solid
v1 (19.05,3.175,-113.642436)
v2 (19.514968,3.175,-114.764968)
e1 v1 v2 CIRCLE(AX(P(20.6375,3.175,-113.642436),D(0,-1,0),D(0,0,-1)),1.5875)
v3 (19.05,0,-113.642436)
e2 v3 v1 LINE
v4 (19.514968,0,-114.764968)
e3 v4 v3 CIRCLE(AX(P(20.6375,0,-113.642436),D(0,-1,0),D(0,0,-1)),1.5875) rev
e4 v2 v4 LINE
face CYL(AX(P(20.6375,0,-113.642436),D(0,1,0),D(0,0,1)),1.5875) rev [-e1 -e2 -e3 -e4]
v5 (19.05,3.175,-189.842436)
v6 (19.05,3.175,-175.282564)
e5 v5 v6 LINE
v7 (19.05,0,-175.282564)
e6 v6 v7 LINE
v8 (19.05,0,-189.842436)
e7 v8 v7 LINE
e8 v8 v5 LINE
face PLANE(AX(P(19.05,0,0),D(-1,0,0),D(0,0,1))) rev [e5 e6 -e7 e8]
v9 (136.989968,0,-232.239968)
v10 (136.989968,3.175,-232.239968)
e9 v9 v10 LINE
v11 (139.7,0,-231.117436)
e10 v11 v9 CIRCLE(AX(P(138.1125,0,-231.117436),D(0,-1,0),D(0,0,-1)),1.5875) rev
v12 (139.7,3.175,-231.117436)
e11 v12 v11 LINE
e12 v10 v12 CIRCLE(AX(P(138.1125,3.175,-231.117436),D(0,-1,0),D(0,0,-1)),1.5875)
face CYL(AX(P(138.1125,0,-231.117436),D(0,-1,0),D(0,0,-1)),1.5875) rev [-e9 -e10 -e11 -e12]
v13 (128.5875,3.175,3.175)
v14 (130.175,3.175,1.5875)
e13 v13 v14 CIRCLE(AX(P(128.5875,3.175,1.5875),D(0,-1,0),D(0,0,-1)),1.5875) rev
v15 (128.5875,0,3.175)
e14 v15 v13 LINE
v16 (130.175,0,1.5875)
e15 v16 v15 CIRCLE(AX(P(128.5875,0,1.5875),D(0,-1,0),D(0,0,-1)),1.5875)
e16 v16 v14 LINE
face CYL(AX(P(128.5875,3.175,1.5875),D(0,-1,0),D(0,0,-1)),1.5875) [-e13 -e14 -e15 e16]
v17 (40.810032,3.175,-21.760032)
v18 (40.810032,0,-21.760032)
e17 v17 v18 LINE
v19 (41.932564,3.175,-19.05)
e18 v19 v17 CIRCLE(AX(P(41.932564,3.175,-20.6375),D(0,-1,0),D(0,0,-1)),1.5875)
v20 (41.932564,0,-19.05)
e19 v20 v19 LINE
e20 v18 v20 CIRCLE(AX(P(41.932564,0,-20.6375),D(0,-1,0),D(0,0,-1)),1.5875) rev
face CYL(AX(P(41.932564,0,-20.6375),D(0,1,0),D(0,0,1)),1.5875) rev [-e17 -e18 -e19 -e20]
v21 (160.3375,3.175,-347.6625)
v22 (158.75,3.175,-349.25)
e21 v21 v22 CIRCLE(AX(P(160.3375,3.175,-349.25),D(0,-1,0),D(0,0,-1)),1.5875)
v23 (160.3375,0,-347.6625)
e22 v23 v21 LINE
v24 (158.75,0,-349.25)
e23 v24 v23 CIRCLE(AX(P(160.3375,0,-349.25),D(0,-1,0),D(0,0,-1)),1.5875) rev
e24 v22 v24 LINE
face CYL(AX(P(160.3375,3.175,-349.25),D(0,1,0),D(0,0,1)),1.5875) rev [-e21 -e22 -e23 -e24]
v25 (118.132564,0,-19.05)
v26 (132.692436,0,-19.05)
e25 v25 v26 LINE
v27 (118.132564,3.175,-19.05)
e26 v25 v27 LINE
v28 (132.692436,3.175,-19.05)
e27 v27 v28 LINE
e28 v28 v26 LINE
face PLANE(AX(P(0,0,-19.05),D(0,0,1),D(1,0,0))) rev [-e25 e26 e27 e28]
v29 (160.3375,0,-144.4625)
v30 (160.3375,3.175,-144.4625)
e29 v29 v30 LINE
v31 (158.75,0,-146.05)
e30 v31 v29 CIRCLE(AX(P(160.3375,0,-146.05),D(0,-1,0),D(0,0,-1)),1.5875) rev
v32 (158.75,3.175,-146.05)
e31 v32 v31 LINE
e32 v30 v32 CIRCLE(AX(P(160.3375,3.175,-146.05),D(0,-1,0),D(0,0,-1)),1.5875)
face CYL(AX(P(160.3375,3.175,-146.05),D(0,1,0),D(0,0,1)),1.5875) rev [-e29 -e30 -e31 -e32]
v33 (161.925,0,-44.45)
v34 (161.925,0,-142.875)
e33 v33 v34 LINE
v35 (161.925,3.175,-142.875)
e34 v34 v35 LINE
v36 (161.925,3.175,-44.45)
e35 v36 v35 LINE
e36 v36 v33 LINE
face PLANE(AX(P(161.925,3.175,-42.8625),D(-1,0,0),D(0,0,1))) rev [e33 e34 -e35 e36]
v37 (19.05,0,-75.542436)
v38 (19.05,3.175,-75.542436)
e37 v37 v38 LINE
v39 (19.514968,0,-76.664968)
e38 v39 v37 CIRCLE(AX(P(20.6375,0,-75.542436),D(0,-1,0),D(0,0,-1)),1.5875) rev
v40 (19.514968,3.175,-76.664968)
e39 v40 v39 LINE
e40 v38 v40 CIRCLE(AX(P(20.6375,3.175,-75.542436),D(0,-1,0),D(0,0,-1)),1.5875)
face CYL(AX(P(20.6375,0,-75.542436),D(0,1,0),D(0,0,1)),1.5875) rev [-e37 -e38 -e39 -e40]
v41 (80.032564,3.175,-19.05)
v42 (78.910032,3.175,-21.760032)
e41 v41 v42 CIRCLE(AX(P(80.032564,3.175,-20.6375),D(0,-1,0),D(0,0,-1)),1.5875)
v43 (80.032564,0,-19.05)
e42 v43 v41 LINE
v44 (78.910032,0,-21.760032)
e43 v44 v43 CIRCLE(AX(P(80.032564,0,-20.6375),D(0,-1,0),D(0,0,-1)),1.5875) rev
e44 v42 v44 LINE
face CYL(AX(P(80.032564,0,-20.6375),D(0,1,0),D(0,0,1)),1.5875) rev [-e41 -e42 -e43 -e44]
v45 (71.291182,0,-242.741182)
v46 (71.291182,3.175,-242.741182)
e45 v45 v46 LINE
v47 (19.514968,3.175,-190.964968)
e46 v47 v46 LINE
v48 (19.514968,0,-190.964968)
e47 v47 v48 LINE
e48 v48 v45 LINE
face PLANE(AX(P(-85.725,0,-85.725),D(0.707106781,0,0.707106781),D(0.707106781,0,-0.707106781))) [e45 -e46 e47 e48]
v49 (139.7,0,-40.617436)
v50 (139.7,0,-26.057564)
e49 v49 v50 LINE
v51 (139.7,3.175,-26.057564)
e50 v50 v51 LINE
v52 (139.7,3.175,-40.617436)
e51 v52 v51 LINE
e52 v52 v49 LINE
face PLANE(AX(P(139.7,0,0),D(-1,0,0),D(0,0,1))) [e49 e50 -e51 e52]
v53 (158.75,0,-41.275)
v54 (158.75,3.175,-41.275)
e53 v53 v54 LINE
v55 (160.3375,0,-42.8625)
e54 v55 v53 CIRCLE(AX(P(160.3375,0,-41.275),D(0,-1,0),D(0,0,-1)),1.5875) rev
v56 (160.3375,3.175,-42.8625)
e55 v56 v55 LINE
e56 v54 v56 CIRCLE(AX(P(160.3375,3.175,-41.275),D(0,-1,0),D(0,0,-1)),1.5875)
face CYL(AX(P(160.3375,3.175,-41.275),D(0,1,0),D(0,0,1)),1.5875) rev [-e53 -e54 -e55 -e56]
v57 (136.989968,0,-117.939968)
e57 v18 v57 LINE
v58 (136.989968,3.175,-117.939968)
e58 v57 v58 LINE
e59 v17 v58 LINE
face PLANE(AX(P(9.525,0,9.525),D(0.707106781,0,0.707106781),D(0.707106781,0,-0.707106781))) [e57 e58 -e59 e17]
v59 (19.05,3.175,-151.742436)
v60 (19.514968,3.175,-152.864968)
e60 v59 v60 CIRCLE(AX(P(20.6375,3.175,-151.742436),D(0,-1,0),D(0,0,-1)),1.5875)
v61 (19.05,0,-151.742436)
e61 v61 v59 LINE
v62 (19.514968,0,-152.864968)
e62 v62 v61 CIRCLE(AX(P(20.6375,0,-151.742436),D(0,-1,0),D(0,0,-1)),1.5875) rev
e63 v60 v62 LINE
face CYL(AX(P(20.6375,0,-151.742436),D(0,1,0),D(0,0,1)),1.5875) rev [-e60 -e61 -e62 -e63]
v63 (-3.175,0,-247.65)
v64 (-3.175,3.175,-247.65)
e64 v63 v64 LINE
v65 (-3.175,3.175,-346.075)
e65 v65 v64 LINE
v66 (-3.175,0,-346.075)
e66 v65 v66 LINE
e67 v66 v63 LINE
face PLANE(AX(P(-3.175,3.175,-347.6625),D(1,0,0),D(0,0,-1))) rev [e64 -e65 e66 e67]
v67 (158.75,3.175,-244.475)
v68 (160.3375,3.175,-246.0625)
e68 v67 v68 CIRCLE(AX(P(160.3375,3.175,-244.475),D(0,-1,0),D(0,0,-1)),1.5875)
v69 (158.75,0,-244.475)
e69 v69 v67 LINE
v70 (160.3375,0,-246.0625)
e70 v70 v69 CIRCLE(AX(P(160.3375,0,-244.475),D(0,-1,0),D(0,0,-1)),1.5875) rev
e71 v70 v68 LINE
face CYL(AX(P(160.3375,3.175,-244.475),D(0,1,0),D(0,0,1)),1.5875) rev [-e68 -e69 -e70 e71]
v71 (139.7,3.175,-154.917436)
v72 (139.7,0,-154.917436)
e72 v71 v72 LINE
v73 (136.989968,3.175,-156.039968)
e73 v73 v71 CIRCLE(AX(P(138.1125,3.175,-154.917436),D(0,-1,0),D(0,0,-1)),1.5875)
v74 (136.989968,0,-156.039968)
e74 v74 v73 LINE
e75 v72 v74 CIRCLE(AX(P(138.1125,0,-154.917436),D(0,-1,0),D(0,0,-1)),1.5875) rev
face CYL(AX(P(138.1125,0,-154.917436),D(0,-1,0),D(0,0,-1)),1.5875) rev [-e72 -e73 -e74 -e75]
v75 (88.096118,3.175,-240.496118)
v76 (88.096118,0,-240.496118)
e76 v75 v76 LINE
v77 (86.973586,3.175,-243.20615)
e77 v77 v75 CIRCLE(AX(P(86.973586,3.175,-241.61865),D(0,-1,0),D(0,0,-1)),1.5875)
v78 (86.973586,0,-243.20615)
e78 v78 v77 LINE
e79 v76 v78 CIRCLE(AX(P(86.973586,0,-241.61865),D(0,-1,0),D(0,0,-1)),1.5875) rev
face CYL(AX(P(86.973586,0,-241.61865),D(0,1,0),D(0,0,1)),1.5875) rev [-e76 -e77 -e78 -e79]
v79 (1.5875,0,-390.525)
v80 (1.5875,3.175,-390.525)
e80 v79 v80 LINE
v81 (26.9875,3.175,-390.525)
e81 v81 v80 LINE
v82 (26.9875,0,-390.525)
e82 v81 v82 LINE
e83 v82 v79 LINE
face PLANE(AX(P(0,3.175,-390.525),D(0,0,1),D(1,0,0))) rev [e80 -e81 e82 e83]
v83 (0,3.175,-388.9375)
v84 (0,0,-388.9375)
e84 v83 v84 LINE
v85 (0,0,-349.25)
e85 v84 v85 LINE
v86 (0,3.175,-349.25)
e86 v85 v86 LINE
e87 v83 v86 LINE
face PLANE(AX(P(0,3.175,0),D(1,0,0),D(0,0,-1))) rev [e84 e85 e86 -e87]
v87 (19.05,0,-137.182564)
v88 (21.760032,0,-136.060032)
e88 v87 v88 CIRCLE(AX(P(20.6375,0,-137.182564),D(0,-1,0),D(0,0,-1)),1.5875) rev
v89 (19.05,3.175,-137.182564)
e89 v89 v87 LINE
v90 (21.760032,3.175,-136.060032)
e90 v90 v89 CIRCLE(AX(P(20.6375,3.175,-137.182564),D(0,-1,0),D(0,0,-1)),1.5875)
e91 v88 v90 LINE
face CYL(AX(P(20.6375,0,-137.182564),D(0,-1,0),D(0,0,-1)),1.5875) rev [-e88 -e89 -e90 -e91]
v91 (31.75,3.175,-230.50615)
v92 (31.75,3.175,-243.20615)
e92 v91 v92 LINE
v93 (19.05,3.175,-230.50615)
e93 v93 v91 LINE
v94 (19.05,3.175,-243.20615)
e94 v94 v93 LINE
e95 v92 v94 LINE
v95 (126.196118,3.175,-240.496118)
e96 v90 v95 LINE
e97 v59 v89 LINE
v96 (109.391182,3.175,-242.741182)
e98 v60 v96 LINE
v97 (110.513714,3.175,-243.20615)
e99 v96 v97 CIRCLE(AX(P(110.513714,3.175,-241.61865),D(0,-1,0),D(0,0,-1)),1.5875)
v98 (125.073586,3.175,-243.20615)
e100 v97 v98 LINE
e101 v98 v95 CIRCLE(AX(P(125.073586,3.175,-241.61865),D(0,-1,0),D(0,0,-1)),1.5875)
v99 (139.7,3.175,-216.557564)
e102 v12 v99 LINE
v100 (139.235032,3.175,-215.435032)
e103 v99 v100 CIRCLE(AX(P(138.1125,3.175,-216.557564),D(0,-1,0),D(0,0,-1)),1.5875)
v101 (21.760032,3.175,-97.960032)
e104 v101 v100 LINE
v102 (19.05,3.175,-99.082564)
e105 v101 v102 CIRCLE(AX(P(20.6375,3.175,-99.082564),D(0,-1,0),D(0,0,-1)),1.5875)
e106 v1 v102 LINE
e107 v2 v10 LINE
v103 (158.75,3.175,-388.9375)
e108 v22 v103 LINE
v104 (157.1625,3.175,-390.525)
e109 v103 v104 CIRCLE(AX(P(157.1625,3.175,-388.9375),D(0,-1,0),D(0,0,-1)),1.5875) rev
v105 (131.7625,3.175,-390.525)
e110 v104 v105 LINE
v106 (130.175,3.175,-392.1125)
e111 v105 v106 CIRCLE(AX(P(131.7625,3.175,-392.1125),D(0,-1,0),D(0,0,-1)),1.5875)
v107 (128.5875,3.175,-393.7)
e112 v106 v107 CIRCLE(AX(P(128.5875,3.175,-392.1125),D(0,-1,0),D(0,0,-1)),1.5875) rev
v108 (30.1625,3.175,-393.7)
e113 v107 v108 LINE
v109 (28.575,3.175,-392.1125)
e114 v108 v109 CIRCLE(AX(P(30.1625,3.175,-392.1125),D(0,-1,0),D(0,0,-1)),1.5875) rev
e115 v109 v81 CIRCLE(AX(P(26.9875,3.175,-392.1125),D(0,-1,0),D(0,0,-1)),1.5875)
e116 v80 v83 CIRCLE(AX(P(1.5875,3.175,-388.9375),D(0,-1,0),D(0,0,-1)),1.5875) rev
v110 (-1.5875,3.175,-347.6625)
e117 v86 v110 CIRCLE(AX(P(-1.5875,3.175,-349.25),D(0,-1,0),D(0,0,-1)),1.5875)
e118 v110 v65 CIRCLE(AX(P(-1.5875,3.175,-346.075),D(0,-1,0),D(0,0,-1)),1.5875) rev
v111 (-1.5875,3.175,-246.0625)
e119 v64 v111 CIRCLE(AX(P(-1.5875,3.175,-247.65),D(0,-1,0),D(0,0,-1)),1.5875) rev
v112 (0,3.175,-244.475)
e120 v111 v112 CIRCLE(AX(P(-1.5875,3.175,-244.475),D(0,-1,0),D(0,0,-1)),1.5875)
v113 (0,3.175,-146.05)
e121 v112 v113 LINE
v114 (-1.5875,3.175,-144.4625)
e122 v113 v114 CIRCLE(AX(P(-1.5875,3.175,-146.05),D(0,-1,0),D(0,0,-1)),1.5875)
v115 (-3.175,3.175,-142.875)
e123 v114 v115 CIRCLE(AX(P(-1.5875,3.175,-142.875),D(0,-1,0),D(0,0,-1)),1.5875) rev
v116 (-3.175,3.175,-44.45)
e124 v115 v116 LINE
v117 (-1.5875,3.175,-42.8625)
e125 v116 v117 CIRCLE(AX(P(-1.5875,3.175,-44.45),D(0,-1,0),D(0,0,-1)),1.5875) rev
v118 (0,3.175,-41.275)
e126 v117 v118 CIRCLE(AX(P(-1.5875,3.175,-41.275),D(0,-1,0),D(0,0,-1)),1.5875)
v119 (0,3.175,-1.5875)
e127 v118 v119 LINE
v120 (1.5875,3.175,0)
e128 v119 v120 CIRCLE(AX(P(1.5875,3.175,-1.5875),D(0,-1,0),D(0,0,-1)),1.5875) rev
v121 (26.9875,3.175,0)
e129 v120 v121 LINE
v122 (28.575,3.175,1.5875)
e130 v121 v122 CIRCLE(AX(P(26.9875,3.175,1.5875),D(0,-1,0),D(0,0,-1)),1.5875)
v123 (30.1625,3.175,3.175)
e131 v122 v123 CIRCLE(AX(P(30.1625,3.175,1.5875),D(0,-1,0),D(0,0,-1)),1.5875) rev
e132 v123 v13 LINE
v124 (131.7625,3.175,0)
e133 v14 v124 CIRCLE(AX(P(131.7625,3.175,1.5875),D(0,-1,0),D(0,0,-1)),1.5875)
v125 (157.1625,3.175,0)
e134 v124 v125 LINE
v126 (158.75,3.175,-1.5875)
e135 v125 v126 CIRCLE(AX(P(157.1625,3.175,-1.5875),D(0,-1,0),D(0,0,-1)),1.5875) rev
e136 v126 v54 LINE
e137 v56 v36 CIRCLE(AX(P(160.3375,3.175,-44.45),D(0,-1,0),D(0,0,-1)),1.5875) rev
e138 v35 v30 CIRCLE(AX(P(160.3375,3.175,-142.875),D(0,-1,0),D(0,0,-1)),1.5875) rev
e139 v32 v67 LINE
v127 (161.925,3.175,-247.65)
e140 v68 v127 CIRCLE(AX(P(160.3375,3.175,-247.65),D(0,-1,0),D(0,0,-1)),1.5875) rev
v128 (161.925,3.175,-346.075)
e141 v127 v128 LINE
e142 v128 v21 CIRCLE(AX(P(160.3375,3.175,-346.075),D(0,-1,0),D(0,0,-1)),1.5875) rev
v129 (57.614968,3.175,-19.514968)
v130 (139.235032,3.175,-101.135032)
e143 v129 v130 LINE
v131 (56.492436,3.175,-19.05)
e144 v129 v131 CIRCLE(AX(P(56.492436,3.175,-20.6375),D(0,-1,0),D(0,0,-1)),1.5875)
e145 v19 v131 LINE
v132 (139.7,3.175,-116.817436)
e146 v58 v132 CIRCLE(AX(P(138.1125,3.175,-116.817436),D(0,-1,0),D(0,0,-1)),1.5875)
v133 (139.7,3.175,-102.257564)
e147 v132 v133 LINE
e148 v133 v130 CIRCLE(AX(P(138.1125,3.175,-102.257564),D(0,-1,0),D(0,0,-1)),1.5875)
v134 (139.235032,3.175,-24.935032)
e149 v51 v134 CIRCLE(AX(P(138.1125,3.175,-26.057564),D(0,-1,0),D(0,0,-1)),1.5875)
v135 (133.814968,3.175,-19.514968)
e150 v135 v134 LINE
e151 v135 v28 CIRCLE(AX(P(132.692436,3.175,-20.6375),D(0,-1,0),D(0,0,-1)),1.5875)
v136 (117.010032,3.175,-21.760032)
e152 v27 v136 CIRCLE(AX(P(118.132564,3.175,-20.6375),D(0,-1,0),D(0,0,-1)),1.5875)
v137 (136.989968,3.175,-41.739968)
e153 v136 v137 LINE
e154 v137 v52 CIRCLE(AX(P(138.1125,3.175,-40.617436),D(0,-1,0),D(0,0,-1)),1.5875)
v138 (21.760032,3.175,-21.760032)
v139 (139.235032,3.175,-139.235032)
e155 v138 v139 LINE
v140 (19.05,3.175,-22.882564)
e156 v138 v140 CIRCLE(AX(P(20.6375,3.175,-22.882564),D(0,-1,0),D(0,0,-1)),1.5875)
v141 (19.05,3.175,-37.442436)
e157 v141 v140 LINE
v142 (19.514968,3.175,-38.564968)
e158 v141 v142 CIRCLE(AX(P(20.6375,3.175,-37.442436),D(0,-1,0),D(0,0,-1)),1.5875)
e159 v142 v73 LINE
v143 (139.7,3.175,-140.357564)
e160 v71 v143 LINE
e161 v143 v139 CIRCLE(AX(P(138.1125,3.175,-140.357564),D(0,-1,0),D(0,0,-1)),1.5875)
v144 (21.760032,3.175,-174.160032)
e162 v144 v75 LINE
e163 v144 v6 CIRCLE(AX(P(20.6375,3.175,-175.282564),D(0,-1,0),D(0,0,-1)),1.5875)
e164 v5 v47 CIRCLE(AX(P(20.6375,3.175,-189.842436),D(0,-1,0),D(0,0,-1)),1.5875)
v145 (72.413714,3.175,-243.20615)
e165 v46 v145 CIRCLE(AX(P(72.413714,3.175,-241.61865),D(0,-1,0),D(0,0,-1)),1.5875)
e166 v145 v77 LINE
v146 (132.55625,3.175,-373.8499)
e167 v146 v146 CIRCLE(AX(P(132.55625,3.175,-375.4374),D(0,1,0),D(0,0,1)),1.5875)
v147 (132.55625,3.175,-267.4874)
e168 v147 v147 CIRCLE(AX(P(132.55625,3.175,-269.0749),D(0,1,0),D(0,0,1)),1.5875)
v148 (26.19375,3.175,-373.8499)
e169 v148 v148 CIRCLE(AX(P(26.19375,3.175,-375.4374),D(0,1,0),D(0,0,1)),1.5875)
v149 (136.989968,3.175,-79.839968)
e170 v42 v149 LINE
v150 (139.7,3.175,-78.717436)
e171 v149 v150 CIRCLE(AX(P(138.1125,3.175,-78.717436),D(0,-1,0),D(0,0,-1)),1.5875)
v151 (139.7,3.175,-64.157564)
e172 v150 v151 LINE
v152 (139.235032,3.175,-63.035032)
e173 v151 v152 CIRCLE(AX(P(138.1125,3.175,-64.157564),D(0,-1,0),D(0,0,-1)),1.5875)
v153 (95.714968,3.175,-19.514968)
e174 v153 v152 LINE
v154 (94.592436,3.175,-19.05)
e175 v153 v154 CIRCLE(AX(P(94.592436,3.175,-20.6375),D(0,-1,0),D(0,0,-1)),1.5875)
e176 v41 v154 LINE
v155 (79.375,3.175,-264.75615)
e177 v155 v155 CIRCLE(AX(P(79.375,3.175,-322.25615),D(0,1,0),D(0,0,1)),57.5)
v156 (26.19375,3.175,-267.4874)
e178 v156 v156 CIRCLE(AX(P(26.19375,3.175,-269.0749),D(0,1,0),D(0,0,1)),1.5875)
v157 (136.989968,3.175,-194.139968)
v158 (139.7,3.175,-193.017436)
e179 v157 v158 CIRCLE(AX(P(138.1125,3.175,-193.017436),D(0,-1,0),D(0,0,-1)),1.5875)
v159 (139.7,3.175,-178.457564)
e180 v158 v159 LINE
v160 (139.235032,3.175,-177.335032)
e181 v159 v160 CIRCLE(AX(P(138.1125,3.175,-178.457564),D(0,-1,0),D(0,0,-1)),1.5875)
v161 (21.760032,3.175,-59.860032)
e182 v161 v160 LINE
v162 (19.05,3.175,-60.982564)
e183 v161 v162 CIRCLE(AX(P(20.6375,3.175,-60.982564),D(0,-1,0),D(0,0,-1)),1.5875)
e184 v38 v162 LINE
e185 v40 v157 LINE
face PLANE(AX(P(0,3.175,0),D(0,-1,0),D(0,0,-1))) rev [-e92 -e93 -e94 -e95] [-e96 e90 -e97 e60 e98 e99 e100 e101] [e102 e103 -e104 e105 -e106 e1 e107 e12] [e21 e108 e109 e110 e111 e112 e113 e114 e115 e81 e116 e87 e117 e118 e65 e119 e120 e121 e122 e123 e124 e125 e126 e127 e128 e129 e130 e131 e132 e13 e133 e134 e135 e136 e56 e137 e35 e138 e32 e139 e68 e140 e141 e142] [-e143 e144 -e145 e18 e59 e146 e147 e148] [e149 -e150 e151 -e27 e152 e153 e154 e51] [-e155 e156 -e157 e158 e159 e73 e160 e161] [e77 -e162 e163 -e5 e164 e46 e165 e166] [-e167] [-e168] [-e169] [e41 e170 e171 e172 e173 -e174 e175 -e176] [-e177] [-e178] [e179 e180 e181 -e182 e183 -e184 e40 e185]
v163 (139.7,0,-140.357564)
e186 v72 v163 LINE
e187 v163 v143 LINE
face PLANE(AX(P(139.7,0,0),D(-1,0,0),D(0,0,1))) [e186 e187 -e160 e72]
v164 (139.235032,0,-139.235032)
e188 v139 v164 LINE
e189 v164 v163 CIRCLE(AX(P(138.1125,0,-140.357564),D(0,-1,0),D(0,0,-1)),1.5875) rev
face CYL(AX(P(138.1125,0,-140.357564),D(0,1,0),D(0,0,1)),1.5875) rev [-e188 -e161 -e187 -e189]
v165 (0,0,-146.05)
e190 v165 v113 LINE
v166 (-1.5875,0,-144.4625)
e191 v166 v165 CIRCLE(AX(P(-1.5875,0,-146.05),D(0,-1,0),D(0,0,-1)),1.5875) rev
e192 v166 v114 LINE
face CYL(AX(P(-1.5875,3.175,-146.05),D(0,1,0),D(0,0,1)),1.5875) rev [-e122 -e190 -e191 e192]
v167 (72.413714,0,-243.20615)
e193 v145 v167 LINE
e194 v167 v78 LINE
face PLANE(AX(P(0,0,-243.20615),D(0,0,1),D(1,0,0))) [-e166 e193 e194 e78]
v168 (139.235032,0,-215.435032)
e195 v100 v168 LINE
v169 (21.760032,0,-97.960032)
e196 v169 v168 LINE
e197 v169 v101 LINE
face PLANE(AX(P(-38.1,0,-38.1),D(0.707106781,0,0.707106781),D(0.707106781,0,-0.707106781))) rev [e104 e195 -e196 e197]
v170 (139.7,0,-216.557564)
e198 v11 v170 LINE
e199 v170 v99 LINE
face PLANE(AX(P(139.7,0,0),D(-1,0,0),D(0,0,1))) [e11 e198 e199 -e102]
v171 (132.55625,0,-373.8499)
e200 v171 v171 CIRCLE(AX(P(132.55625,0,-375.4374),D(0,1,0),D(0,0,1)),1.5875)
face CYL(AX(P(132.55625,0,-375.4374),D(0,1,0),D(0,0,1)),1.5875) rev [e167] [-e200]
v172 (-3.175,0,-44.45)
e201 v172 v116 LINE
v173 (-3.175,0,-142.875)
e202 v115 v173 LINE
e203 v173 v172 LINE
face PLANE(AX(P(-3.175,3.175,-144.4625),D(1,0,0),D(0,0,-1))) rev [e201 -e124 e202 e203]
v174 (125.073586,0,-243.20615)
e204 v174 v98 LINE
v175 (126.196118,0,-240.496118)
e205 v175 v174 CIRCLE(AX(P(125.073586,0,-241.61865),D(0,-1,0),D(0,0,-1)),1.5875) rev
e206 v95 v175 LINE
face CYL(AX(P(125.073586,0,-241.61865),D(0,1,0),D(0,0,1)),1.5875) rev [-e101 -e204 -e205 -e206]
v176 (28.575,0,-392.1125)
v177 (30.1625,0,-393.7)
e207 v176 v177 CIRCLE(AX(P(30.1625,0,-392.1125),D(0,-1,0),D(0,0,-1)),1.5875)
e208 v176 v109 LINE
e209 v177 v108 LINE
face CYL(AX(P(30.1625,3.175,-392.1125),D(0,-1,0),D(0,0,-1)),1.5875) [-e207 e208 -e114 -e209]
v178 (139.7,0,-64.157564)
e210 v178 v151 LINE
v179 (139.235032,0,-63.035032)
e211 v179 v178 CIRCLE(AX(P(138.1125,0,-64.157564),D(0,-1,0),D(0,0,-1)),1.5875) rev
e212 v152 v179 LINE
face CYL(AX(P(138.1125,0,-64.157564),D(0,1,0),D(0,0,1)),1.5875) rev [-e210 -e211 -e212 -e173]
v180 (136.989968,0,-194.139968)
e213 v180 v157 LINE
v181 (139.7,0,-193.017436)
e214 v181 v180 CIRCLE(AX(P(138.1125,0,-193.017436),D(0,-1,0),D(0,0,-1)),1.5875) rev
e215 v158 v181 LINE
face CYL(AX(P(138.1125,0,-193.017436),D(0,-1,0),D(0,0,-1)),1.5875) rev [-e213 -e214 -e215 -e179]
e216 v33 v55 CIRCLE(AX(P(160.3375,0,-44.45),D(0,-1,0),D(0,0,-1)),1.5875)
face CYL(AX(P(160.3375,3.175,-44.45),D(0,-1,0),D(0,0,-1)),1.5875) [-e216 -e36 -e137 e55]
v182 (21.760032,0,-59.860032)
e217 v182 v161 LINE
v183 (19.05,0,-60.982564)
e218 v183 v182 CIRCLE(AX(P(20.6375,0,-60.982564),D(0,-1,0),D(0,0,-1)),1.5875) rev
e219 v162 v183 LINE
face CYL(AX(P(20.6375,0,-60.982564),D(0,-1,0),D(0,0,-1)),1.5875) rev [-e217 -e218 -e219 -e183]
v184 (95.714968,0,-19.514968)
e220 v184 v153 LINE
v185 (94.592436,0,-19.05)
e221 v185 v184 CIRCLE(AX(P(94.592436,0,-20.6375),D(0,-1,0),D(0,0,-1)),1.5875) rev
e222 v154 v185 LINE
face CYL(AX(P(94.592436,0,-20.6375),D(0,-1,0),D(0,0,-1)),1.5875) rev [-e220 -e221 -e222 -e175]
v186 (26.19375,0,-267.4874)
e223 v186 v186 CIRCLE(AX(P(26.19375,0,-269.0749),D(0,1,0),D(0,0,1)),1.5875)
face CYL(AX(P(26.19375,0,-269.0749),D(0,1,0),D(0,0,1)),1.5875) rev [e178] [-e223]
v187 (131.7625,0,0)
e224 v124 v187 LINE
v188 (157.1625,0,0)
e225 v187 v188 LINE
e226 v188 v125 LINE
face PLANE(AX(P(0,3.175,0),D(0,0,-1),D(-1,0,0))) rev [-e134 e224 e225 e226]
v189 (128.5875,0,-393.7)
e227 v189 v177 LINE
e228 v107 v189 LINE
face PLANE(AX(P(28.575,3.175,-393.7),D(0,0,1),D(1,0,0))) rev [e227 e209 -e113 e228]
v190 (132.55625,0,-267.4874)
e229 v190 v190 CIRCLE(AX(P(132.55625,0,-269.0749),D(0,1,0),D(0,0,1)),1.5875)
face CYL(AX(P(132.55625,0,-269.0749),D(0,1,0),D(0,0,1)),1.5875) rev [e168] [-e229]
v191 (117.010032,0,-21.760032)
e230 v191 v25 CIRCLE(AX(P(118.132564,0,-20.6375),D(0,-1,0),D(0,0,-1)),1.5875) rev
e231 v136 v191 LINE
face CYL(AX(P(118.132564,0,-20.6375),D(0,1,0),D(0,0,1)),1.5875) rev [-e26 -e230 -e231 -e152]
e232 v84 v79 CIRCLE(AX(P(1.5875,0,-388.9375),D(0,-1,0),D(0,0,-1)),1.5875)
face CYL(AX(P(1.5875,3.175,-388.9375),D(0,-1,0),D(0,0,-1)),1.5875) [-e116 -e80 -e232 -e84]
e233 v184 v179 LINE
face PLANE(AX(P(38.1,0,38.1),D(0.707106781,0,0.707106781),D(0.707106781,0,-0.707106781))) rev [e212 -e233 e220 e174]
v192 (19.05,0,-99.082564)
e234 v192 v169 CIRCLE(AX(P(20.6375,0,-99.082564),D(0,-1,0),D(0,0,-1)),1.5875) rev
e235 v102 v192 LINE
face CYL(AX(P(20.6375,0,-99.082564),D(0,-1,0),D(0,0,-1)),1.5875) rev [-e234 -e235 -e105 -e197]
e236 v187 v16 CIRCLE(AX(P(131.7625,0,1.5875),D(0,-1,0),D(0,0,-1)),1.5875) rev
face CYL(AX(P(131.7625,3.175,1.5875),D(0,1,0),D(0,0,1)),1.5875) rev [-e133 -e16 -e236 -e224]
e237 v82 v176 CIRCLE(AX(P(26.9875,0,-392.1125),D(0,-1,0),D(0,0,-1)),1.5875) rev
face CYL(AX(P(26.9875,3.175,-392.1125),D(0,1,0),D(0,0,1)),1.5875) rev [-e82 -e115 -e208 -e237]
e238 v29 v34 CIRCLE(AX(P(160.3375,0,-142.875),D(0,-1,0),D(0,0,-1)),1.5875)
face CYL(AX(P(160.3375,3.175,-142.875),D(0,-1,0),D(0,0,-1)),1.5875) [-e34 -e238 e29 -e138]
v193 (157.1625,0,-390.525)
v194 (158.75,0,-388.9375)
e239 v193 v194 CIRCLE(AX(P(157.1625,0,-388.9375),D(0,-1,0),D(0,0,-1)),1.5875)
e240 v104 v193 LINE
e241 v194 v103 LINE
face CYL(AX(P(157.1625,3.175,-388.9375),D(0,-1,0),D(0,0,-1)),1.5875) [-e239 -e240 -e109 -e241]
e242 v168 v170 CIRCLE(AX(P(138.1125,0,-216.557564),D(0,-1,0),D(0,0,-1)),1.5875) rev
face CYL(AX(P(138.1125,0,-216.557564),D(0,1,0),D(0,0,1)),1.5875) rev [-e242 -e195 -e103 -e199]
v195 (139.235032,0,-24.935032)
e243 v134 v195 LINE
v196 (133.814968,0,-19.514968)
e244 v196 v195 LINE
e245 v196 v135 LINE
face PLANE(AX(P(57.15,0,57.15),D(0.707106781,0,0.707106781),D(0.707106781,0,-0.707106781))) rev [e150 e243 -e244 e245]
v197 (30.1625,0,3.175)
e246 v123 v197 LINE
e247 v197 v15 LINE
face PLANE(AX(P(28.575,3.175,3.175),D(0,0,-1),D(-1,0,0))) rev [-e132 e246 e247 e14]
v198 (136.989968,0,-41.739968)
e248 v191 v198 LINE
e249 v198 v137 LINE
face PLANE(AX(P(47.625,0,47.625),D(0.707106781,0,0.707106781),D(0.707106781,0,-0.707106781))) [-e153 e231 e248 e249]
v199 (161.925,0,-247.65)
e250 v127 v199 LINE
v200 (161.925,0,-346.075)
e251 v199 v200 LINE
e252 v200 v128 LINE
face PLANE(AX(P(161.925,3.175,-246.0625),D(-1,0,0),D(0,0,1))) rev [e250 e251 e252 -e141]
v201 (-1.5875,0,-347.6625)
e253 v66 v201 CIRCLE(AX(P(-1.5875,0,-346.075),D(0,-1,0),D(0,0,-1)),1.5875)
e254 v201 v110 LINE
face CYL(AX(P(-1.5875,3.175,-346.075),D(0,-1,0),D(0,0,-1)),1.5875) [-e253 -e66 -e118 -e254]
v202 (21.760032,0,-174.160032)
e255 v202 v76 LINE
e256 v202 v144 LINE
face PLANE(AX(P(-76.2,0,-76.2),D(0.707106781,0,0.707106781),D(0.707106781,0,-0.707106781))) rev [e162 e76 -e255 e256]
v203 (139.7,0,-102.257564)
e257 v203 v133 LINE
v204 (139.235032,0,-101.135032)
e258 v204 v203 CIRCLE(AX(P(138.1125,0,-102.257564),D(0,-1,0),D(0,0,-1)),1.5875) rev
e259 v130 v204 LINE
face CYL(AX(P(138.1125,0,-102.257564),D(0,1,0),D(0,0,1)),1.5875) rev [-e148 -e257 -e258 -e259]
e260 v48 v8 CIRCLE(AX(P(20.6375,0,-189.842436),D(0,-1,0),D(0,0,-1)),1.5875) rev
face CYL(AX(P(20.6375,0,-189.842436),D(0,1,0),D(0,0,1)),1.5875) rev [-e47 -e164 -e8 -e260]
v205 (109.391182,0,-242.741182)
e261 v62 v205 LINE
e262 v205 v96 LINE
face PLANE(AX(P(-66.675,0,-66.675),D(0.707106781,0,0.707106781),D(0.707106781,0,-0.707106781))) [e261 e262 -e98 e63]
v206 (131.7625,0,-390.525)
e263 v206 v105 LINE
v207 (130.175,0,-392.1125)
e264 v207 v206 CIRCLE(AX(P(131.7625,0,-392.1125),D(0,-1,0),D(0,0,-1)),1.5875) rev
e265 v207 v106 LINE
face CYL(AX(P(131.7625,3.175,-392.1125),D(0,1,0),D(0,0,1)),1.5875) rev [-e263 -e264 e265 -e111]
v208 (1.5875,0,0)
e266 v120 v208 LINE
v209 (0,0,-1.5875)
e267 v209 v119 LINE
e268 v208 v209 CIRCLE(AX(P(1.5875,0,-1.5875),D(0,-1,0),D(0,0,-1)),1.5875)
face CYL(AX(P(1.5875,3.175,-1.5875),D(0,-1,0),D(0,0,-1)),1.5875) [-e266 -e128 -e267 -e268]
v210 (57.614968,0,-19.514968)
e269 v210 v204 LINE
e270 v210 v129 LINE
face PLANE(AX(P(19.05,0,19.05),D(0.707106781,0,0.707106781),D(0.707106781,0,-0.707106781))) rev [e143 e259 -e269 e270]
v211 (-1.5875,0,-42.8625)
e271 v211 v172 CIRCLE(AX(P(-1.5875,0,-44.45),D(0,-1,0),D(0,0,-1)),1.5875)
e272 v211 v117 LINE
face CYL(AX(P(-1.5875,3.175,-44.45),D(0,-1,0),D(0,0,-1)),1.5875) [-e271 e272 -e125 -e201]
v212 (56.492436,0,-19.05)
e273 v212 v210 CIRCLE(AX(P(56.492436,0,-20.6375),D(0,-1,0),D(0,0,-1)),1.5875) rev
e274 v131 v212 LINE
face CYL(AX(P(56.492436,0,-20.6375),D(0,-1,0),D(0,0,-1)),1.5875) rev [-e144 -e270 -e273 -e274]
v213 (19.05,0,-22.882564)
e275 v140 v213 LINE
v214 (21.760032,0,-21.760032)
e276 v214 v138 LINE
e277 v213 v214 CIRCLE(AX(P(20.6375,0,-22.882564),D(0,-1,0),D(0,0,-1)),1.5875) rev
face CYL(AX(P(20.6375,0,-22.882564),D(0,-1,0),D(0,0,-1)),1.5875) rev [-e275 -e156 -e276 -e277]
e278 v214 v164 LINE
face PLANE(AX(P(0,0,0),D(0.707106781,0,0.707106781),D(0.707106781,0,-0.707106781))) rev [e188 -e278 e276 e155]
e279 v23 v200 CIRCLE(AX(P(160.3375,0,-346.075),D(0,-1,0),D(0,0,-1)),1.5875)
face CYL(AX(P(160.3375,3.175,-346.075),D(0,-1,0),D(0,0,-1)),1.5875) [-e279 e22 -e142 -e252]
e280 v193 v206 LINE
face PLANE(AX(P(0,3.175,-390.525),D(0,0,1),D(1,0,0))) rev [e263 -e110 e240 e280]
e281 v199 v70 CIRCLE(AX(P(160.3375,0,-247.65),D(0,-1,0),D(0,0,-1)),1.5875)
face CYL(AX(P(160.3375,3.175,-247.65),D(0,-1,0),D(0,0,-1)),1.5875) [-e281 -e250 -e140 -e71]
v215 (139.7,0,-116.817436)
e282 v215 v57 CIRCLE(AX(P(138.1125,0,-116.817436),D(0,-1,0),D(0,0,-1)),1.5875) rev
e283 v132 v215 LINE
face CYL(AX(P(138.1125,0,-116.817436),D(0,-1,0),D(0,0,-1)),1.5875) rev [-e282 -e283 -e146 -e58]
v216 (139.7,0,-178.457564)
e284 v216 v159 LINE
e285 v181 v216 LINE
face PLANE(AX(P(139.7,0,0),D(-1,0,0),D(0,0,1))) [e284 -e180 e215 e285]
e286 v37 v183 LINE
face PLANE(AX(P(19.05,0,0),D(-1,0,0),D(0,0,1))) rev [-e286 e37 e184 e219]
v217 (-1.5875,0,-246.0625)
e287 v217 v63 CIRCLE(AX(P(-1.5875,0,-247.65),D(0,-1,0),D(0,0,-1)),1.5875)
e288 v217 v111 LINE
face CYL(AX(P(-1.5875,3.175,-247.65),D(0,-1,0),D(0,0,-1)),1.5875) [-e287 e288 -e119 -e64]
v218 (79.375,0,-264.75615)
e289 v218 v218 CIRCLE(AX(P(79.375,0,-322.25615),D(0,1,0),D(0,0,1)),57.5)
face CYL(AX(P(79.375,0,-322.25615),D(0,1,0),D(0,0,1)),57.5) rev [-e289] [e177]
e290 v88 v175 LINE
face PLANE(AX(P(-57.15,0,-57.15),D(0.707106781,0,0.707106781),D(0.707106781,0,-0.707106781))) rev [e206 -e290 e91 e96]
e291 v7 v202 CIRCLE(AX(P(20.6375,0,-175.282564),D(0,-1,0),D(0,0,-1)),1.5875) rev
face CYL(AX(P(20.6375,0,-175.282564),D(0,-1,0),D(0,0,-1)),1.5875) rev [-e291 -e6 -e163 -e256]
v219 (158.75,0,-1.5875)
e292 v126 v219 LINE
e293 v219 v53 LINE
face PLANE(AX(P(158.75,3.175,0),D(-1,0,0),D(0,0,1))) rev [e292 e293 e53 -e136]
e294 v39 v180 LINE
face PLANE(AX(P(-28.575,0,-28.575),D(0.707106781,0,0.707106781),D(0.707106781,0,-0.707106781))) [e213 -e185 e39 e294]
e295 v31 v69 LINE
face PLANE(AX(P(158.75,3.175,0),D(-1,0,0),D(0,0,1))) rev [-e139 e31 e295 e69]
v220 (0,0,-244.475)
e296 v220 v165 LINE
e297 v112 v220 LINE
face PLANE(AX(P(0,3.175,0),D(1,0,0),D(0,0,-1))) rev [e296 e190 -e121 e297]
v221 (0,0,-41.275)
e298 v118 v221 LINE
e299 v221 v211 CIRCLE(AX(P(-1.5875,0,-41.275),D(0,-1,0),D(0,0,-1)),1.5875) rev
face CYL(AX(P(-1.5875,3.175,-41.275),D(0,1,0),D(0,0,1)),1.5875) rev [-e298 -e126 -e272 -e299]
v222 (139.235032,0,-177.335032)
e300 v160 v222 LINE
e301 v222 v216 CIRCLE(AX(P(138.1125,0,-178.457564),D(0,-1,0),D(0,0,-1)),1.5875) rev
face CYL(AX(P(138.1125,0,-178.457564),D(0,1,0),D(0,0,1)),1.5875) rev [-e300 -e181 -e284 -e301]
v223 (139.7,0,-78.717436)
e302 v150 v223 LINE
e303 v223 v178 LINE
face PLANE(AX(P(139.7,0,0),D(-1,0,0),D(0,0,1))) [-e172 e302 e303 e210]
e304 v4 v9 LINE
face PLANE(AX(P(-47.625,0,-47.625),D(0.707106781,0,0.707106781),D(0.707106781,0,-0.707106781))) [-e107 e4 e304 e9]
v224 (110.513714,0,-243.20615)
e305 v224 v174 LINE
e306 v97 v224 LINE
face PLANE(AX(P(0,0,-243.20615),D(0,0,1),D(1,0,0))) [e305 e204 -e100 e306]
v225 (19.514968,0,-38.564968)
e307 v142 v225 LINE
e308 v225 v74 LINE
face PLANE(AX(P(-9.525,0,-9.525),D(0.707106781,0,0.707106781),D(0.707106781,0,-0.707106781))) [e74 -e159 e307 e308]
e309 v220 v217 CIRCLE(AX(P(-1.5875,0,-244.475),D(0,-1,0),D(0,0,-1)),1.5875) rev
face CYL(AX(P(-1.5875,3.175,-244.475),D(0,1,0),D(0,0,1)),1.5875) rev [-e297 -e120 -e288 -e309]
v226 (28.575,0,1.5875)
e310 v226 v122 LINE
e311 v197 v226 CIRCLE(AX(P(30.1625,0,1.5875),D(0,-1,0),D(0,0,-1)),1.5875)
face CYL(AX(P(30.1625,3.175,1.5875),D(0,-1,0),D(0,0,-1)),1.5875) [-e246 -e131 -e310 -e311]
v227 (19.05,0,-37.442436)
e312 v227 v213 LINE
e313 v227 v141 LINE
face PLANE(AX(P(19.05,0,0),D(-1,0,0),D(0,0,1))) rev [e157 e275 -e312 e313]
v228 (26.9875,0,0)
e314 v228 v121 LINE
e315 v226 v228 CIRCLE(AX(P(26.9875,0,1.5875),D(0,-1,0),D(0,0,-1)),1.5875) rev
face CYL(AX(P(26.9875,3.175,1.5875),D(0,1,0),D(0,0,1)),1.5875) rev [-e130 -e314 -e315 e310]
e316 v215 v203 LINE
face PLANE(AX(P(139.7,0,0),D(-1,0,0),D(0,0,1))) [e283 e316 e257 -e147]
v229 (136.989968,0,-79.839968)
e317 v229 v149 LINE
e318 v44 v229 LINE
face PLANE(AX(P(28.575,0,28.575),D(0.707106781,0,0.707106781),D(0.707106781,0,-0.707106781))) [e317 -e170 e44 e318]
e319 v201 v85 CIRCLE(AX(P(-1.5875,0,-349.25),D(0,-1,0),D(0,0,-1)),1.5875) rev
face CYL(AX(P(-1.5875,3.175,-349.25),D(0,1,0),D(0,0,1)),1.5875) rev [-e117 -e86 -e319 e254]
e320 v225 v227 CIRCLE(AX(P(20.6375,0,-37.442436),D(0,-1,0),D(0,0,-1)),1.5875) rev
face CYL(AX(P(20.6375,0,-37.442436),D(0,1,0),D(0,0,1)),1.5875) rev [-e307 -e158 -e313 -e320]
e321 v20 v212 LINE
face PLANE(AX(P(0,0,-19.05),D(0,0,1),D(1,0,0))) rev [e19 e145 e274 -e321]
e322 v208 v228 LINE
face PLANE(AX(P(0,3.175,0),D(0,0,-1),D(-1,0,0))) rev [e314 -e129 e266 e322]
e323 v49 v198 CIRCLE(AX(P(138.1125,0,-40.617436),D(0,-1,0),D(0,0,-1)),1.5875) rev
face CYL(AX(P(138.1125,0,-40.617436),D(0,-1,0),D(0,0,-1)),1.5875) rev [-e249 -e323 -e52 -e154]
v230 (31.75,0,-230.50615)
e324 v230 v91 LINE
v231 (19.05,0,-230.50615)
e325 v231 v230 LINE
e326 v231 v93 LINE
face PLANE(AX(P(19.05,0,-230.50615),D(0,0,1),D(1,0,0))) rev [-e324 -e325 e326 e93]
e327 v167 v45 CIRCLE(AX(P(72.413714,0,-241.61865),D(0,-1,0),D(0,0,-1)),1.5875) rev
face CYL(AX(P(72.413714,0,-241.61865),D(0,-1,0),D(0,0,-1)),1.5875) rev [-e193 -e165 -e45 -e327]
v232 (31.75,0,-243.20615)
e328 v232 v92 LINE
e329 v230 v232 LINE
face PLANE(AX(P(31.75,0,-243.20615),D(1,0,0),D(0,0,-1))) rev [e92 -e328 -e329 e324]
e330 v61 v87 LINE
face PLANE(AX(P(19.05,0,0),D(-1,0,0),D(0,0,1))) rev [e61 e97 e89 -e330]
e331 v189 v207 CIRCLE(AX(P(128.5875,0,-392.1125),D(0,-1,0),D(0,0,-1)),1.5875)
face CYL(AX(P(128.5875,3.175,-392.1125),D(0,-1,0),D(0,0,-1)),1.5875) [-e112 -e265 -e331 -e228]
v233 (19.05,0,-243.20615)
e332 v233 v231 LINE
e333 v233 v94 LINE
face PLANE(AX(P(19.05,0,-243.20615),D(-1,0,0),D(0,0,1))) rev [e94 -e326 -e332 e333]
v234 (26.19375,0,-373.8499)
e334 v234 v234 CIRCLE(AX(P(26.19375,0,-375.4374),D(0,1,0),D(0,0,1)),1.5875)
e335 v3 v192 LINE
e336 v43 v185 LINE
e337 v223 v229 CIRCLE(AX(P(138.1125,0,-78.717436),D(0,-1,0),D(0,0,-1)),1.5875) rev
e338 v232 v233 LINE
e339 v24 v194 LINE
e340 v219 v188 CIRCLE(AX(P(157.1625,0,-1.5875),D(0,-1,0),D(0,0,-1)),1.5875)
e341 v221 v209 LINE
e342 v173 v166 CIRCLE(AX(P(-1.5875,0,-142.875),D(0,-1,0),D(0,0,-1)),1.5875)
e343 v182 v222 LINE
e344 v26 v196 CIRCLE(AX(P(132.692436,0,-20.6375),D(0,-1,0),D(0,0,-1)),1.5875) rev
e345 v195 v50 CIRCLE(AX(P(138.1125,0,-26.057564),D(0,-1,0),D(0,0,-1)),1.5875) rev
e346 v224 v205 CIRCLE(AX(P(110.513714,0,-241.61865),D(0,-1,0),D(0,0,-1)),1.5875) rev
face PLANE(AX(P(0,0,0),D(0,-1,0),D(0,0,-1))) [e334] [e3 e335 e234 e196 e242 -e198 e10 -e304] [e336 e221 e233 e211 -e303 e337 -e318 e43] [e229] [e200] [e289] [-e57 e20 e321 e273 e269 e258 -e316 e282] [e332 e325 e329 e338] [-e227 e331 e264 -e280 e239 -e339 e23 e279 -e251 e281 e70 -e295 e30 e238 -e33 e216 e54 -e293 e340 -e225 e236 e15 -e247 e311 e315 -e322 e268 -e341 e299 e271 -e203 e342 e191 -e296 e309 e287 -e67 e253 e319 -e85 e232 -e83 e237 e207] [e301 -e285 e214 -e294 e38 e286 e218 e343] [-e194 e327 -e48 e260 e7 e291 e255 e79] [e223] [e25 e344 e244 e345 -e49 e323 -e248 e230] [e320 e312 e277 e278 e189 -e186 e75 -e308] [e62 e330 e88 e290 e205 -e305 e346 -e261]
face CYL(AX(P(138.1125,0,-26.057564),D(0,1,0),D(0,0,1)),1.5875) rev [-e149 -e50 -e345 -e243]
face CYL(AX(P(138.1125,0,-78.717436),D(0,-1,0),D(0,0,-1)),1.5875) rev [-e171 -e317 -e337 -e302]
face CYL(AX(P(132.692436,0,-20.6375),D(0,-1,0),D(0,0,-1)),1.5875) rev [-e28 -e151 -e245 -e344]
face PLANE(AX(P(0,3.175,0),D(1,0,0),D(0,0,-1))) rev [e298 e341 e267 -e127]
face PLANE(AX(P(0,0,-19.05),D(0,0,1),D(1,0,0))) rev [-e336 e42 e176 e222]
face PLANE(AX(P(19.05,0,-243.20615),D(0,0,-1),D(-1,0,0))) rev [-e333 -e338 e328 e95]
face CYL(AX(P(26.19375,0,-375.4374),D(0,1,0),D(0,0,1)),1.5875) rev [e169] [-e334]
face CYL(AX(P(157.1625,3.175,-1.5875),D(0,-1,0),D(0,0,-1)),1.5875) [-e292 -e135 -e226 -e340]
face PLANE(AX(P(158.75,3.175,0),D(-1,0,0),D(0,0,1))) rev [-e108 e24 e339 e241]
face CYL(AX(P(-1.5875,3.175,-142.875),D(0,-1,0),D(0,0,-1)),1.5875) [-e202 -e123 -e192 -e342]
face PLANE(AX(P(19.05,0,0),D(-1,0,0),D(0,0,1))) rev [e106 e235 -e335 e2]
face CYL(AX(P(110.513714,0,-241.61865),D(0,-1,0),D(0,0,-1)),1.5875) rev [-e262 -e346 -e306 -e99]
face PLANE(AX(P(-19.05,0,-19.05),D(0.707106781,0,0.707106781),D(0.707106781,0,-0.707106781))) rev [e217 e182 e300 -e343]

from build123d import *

# Parameters (mm, degrees)
SKETCH1_W           = 158.75
SKETCH1_H           = 390.525
BOSS_EXTRUDE1_DEPTH = 3.175
SKETCH2_W           = 101.6
SKETCH2_H           = 3.175
BOSS_EXTRUDE2_DEPTH = 3.175
SKETCH3_W           = 3.175
SKETCH3_H           = 101.6
BOSS_EXTRUDE3_DEPTH = 3.175
SKETCH4_R           = 1.5875
SKETCH4_R_2         = 57.5
CUT_EXTRUDE1_DEPTH  = 426.710554544
CUT_EXTRUDE2_DEPTH  = 426.710554544
FILLET1_R           = 1.5875
FILLET2_R           = 1.5875
SKETCH7_W           = 12.7
SKETCH7_H           = 12.7
CUT_EXTRUDE3_DEPTH  = 426.710554544


with BuildPart() as part:
    # Sketch1 → Boss-Extrude1 (new body)
    with BuildSketch(Plane(origin=(0, 0, 0), x_dir=(1, 0, 0), z_dir=(0, 1, 0))):
        with Locations((79.375, 195.2625)):
            Rectangle(SKETCH1_W, SKETCH1_H)
    extrude(amount=BOSS_EXTRUDE1_DEPTH)

    # Sketch2 → Boss-Extrude2 (add)
    with BuildSketch(Plane(origin=(0, 0, 0), x_dir=(1, 0, 0), z_dir=(0, 1, 0))):
        with Locations((79.375, 392.1125)):
            Rectangle(SKETCH2_W, SKETCH2_H)
        with Locations((79.375, -1.5875)):
            Rectangle(SKETCH2_W, SKETCH2_H)
    extrude(amount=BOSS_EXTRUDE2_DEPTH)

    # Sketch3 → Boss-Extrude3 (add)
    with BuildSketch(Plane(origin=(0, 0, 0), x_dir=(1, 0, 0), z_dir=(0, 1, 0))):
        with Locations((-1.5875, 296.8625)):
            Rectangle(SKETCH3_W, SKETCH3_H)
        with Locations((-1.5875, 93.6625)):
            Rectangle(SKETCH3_W, SKETCH3_H)
        with Locations((160.3375, 93.6625)):
            Rectangle(SKETCH3_W, SKETCH3_H)
        with Locations((160.3375, 296.8625)):
            Rectangle(SKETCH3_W, SKETCH3_H)
    extrude(amount=BOSS_EXTRUDE3_DEPTH)

    # Sketch4 → Cut-Extrude1 (cut, through all)
    with BuildSketch(Plane(origin=(0, 3.175, 0), x_dir=(1, 0, 0), z_dir=(0, 1, 0))):
        with Locations(Location((26.19375, 375.4374, 0), (0, 0, 270))):
            Circle(SKETCH4_R)
        with Locations(Location((132.55625, 375.4374, 0), (0, 0, 270))):
            Circle(SKETCH4_R)
        with Locations(Location((26.19375, 269.0749, 0), (0, 0, 270))):
            Circle(SKETCH4_R)
        with Locations(Location((132.55625, 269.0749, 0), (0, 0, 270))):
            Circle(SKETCH4_R)
        with Locations(Location((79.375, 322.25615, 0), (0, 0, 270))):
            Circle(SKETCH4_R_2)
    extrude(amount=-CUT_EXTRUDE1_DEPTH, mode=Mode.SUBTRACT)

    # Sketch5 → Cut-Extrude2 (cut, through all)
    with BuildSketch(Plane(origin=(0, 3.175, 0), x_dir=(1, 0, 0), z_dir=(0, 1, 0))):
        Polygon((71.75615, 243.20615), (19.05, 190.5), (19.05, 171.45), (90.80615, 243.20615), align=None)
        Polygon((109.85615, 243.20615), (19.05, 152.4), (19.05, 133.35), (128.90615, 243.20615), align=None)
        Polygon((139.7, 234.95), (19.05, 114.3), (19.05, 95.25), (139.7, 215.9), align=None)
        Polygon((139.7, 196.85), (19.05, 76.2), (19.05, 57.15), (139.7, 177.8), align=None)
        Polygon((139.7, 158.75), (19.05, 38.1), (19.05, 19.05), (139.7, 139.7), align=None)
        Polygon((139.7, 120.65), (38.1, 19.05), (57.15, 19.05), (139.7, 101.6), align=None)
        Polygon((139.7, 82.55), (76.2, 19.05), (95.25, 19.05), (139.7, 63.5), align=None)
        Polygon((139.7, 44.45), (114.3, 19.05), (133.35, 19.05), (139.7, 25.4), align=None)
    extrude(amount=-CUT_EXTRUDE2_DEPTH, mode=Mode.SUBTRACT)

    # Fillet1
    fillet1_edges = [part.edges().sort_by_distance(p)[0] for p in [
        (0, 1.5875, -347.6625),
        (-3.175, 1.5875, -347.6625),
        (-3.175, 1.5875, -246.0625),
        (0, 1.5875, -246.0625),
        (0, 1.5875, -144.4625),
        (-3.175, 1.5875, -144.4625),
        (-3.175, 1.5875, -42.8625),
        (0, 1.5875, -42.8625),
        (0, 1.5875, 0),
        (28.575, 1.5875, 0),
        (28.575, 1.5875, 3.175),
        (130.175, 1.5875, 3.175),
        (130.175, 1.5875, 0),
        (158.75, 1.5875, 0),
        (161.925, 1.5875, -42.8625),
        (158.75, 1.5875, -42.8625),
        (161.925, 1.5875, -144.4625),
        (158.75, 1.5875, -144.4625),
        (158.75, 1.5875, -246.0625),
        (161.925, 1.5875, -246.0625),
        (161.925, 1.5875, -347.6625),
        (158.75, 1.5875, -347.6625),
        (158.75, 1.5875, -390.525),
        (130.175, 1.5875, -390.525),
        (130.175, 1.5875, -393.7),
        (28.575, 1.5875, -393.7),
        (28.575, 1.5875, -390.525),
        (0, 1.5875, -390.525),
    ]]
    fillet(fillet1_edges, radius=FILLET1_R - 0.0001)  # a hair under: the kernel refuses the full size

    # Fillet2
    fillet2_edges = [part.edges().sort_by_distance(p)[0] for p in [
        (19.05, 1.5875, -38.1),
        (139.7, 1.5875, -158.75),
        (139.7, 1.5875, -139.7),
        (19.05, 1.5875, -19.05),
        (19.05, 1.5875, -76.2),
        (139.7, 1.5875, -196.85),
        (139.7, 1.5875, -177.8),
        (19.05, 1.5875, -57.15),
        (95.25, 1.5875, -19.05),
        (76.2, 1.5875, -19.05),
        (139.7, 1.5875, -82.55),
        (139.7, 1.5875, -63.5),
        (57.15, 1.5875, -19.05),
        (38.1, 1.5875, -19.05),
        (139.7, 1.5875, -120.65),
        (139.7, 1.5875, -101.6),
        (19.05, 1.5875, -190.5),
        (71.75615, 1.5875, -243.20615),
        (90.80615, 1.5875, -243.20615),
        (19.05, 1.5875, -171.45),
        (19.05, 1.5875, -114.3),
        (139.7, 1.5875, -234.95),
        (139.7, 1.5875, -215.9),
        (19.05, 1.5875, -95.25),
        (19.05, 1.5875, -152.4),
        (109.85615, 1.5875, -243.20615),
        (128.90615, 1.5875, -243.20615),
        (19.05, 1.5875, -133.35),
        (133.35, 1.5875, -19.05),
        (114.3, 1.5875, -19.05),
        (139.7, 1.5875, -44.45),
        (139.7, 1.5875, -25.4),
    ]]
    fillet(fillet2_edges, radius=FILLET2_R)

    # Sketch7 → Cut-Extrude3 (cut, through all)
    with BuildSketch(Plane(origin=(0, 3.175, 0), x_dir=(1, 0, 0), z_dir=(0, 1, 0))):
        with Locations((25.4, 236.85615)):
            Rectangle(SKETCH7_W, SKETCH7_H)
    extrude(amount=-CUT_EXTRUDE3_DEPTH, mode=Mode.SUBTRACT)


solid = part.part
